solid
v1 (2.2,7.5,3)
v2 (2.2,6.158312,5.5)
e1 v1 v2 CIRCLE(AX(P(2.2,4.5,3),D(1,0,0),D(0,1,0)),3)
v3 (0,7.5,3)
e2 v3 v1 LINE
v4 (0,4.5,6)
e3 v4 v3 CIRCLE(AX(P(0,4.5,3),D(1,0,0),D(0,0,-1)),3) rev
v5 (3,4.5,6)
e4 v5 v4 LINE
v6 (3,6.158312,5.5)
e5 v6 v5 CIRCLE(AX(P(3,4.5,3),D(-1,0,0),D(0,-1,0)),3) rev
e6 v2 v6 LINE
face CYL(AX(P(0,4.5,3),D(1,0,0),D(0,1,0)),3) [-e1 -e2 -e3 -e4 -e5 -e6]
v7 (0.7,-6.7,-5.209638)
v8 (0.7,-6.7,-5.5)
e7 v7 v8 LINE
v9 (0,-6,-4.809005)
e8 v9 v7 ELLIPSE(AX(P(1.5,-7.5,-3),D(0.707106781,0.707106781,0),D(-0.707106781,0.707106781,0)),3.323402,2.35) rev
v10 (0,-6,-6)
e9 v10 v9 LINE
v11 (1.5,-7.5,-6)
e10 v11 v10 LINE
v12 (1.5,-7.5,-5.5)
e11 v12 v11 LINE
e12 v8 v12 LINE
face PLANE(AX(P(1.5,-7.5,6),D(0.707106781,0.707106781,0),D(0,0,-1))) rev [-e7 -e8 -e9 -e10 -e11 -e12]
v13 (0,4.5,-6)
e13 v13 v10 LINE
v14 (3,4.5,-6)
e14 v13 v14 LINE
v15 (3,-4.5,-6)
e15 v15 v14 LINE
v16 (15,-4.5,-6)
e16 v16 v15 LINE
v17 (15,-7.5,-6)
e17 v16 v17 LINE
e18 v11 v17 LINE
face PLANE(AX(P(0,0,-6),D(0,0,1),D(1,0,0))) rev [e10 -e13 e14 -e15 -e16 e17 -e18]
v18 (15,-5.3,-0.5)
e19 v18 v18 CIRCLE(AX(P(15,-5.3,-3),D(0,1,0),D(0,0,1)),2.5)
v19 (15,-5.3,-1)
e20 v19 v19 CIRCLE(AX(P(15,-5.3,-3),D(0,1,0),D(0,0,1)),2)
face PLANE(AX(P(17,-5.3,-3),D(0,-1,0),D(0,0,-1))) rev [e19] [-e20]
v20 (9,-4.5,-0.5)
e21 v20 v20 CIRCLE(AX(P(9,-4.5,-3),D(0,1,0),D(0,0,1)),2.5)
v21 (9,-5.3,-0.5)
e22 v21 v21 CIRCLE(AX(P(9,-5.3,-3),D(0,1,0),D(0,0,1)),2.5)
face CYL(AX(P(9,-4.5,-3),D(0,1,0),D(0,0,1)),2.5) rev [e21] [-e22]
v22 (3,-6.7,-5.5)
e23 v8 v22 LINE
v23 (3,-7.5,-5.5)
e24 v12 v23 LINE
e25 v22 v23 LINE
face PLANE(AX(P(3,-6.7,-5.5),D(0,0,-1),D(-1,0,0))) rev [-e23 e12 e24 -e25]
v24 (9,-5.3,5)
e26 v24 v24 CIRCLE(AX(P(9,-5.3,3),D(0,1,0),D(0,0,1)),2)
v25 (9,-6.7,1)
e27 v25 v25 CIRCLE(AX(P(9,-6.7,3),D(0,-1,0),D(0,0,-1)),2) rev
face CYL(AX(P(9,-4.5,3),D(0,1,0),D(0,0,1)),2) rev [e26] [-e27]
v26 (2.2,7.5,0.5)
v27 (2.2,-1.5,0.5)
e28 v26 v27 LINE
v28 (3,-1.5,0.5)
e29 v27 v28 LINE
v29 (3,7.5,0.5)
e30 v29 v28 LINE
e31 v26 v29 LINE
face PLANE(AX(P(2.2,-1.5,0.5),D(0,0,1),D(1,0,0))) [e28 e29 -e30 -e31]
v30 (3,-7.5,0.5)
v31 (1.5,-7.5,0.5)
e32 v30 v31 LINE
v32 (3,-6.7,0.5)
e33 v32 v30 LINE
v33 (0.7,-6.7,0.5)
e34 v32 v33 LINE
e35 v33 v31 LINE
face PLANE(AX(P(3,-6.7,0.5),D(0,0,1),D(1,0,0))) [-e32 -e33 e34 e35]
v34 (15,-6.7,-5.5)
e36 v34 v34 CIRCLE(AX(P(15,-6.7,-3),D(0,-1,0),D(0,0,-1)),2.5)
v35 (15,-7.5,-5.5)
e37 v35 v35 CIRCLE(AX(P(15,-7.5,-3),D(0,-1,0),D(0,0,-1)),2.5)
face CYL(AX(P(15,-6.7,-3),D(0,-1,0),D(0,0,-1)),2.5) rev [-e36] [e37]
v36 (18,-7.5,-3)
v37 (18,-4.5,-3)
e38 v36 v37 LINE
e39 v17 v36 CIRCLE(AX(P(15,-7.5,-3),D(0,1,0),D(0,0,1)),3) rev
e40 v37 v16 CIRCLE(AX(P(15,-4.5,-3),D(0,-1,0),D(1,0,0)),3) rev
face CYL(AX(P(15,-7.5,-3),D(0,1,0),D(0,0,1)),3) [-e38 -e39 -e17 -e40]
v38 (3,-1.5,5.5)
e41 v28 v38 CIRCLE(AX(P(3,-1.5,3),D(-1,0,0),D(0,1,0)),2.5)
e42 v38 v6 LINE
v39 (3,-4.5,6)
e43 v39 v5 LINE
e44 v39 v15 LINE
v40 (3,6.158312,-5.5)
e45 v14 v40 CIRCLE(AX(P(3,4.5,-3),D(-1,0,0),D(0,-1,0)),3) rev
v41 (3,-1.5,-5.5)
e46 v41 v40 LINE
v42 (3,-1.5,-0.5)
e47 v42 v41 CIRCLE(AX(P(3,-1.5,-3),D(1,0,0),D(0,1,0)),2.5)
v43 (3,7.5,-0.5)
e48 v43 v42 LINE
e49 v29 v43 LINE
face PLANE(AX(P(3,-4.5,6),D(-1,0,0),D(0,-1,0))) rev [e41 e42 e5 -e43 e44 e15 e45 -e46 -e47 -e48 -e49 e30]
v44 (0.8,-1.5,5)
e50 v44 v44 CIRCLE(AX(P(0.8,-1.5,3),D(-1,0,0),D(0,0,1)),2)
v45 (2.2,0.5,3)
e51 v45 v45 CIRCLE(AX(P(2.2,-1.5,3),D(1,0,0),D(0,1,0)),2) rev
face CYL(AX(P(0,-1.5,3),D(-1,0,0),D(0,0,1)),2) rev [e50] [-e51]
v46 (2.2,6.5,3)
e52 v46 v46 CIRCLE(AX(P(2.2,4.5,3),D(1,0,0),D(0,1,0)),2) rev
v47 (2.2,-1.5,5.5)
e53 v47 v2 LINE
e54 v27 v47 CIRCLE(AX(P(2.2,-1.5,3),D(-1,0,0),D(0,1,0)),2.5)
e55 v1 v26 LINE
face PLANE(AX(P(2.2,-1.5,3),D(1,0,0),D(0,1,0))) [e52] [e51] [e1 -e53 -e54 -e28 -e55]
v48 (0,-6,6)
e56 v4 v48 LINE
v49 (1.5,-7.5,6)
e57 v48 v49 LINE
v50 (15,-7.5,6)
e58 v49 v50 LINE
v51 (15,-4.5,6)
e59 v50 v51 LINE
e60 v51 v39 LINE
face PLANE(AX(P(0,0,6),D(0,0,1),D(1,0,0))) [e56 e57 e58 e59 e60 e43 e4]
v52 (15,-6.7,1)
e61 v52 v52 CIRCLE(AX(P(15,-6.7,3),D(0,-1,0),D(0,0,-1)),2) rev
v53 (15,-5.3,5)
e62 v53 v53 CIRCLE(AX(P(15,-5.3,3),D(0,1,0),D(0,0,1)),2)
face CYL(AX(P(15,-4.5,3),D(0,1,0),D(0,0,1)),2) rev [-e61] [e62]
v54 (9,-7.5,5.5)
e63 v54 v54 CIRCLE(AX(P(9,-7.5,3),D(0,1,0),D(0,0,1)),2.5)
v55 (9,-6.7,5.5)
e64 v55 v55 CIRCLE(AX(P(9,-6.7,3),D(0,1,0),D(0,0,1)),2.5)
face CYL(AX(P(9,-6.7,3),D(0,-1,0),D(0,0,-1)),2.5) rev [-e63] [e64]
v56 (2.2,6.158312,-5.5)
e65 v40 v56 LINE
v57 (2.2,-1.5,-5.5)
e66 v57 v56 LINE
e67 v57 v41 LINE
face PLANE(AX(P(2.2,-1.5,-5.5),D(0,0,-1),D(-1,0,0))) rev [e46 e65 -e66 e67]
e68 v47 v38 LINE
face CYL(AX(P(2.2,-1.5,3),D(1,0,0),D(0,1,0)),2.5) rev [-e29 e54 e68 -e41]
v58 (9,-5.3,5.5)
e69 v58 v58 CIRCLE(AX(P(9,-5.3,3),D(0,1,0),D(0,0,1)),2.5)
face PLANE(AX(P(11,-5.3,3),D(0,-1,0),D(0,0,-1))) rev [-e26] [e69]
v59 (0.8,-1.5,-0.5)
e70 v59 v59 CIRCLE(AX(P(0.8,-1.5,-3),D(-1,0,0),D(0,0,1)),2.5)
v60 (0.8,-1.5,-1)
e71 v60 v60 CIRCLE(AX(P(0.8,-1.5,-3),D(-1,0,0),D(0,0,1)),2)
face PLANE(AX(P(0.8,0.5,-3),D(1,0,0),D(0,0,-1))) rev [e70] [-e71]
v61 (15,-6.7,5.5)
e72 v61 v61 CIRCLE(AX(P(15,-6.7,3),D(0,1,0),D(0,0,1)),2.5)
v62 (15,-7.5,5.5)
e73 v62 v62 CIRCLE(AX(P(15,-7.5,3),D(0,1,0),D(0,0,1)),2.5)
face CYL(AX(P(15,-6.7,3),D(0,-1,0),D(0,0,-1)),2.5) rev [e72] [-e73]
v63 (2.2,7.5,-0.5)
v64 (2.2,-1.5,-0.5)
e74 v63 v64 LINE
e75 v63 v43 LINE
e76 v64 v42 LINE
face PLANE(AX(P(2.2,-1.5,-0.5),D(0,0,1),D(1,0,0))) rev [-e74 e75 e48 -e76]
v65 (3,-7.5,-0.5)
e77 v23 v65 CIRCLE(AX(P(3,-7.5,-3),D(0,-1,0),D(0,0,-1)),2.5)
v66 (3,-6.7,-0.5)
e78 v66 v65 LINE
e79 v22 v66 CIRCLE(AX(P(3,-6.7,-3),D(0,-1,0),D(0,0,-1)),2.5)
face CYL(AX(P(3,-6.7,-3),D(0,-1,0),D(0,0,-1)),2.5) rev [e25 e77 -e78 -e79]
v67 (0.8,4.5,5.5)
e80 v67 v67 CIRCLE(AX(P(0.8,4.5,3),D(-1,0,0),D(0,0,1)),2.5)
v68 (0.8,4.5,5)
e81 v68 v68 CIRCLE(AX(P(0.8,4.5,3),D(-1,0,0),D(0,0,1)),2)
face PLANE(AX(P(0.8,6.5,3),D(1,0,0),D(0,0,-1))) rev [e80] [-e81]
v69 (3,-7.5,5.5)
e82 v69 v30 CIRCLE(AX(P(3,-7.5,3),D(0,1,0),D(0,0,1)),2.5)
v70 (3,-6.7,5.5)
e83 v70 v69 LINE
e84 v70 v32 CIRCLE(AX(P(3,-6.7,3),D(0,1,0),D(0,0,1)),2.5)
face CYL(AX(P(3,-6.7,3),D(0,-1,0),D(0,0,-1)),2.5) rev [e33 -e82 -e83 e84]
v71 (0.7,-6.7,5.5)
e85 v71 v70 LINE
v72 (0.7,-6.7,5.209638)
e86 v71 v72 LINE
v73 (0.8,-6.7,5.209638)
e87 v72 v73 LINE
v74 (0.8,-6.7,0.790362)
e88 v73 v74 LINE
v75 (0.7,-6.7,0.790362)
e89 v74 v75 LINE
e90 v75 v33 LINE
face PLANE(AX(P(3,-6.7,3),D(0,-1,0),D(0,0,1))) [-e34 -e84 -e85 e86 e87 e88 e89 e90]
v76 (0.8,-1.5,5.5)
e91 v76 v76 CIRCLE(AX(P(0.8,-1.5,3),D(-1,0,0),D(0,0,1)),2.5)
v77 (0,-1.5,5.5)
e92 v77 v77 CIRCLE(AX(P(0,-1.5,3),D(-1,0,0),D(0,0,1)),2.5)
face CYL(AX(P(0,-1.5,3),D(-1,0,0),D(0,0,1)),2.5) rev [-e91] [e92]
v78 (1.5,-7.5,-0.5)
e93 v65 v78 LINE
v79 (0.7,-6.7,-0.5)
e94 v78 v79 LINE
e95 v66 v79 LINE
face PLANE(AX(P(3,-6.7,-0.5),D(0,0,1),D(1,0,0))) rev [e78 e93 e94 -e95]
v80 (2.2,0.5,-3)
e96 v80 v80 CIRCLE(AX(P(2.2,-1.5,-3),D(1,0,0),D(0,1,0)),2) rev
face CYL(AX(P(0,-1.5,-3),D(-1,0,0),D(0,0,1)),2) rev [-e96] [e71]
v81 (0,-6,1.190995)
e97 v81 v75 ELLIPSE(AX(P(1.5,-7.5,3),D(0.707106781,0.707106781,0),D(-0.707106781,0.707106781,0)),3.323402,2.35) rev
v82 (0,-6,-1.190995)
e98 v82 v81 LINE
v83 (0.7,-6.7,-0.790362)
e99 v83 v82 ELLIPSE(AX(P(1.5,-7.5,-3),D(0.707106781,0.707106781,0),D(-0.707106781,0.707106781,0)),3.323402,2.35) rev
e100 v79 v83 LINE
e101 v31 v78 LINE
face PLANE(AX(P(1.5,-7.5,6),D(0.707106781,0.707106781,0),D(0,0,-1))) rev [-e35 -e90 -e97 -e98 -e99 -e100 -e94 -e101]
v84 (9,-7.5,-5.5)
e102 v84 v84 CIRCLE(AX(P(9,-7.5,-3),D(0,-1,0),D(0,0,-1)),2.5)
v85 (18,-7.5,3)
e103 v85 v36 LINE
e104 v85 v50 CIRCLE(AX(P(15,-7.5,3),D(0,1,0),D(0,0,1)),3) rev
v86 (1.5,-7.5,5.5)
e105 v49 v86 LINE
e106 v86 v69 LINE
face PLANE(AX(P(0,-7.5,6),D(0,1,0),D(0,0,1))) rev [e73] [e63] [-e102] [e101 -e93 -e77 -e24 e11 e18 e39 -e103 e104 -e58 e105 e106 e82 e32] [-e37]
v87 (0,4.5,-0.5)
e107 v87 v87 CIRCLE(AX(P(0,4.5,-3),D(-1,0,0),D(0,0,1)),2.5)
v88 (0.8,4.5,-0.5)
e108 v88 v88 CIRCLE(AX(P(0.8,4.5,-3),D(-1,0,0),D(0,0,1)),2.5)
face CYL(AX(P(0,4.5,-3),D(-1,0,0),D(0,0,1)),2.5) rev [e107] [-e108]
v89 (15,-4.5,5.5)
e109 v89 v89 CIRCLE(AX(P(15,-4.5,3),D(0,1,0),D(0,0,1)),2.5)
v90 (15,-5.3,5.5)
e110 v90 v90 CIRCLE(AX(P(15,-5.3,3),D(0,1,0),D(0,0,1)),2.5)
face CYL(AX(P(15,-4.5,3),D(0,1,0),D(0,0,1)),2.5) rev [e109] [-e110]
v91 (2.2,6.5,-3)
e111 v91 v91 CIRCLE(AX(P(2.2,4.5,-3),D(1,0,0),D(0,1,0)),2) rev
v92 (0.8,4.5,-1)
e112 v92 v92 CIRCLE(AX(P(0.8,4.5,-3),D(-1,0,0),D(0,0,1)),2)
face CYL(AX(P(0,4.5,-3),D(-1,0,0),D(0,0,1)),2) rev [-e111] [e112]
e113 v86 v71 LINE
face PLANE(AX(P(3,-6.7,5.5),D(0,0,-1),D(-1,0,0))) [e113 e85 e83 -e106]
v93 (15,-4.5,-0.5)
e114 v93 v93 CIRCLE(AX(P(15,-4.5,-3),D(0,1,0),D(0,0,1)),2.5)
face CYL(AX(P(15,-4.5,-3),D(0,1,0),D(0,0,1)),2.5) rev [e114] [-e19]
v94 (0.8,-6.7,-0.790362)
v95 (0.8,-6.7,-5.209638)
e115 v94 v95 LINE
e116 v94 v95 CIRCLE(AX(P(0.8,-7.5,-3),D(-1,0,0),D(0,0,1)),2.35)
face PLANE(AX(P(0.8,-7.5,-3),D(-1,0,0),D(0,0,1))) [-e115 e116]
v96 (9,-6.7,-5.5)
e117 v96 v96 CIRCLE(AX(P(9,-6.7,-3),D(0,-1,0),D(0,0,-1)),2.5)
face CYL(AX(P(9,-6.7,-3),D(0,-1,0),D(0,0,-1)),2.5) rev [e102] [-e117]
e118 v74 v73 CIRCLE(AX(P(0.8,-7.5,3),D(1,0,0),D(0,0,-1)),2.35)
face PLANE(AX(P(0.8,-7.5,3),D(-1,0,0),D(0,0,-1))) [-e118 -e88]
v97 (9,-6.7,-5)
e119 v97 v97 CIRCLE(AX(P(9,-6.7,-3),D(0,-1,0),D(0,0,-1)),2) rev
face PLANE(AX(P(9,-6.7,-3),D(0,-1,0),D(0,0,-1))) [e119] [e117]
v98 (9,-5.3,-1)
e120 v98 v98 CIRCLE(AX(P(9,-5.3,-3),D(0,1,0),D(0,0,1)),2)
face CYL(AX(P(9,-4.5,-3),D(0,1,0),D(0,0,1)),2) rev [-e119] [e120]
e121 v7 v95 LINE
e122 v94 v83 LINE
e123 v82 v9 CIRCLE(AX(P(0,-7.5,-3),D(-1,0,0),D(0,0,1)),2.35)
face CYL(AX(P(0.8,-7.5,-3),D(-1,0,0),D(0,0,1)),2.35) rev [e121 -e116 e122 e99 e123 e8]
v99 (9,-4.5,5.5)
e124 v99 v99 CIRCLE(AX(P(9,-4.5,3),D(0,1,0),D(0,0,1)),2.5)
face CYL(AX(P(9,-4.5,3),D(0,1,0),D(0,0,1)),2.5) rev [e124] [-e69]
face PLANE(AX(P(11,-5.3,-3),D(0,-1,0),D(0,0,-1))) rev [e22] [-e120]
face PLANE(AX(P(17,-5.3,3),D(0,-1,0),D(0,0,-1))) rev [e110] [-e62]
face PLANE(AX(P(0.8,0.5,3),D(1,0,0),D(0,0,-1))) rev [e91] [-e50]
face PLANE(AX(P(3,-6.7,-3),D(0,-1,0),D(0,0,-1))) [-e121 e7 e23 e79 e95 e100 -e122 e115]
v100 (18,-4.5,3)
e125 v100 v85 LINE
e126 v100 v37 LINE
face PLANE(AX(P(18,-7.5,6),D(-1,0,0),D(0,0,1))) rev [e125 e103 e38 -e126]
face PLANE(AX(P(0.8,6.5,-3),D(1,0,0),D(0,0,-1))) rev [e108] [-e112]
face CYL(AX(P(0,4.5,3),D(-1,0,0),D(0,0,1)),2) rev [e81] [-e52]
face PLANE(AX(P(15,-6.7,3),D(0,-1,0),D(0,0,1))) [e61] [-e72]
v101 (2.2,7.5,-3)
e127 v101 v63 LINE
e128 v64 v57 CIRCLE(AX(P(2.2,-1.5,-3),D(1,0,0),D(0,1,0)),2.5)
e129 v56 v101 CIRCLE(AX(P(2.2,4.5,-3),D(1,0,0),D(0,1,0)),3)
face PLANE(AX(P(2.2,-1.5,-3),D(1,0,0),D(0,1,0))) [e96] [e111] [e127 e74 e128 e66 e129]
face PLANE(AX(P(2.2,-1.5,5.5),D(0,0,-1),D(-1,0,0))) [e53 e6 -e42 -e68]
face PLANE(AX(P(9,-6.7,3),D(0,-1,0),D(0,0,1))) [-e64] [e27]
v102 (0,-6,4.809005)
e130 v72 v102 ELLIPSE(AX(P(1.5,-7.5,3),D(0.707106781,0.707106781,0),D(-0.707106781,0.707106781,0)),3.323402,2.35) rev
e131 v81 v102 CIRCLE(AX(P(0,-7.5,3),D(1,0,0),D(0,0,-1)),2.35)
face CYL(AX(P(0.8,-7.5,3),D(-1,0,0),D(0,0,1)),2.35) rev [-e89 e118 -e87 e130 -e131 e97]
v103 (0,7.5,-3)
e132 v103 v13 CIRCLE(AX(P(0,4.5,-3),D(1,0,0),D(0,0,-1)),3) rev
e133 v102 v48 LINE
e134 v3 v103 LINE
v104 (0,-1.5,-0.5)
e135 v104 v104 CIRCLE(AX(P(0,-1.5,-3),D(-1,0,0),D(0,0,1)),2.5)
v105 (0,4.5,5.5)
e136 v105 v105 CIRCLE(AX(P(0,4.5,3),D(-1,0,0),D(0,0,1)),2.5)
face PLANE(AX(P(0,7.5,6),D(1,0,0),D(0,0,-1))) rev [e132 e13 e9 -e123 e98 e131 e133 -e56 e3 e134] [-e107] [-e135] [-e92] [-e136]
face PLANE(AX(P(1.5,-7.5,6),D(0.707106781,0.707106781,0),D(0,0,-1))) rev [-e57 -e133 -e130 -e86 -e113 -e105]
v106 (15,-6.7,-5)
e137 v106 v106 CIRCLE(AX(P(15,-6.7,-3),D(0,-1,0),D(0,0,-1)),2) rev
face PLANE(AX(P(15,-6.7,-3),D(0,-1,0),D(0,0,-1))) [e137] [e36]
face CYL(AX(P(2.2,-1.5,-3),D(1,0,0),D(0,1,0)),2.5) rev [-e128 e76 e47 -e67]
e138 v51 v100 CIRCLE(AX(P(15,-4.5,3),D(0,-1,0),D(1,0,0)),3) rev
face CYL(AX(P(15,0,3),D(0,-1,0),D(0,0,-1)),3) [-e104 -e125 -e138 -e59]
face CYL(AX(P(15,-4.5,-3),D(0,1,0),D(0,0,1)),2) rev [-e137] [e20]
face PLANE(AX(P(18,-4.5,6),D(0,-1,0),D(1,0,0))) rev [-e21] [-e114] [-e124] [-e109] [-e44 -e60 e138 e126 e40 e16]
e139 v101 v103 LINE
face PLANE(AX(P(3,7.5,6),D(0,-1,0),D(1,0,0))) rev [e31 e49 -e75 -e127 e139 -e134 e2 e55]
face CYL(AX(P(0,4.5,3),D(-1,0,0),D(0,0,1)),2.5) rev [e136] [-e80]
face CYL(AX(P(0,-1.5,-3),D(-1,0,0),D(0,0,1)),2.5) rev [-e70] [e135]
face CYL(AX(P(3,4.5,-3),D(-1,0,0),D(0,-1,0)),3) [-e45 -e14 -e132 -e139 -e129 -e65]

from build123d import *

# Parameters (mm, degrees)
BOSS_EXTRUDE1_DEPTH = 6
HOLE2_D             = 4
HOLE2_DEPTH         = 3
HOLE2_CBORE_D       = 5
HOLE2_CBORE_DEPTH   = 0.8
HOLE2_TIP           = 1.201721238
HOLE3_D             = 4
HOLE3_DEPTH         = 18
HOLE3_CBORE_D       = 5
HOLE3_CBORE_DEPTH   = 0.8
HOLE3_TIP           = 1.201721238
CUT_EXTRUDE1_START  = -0.8
CUT_EXTRUDE1_DEPTH  = 0.8
CUT_EXTRUDE2_START  = -0.8
SKETCH12_R          = 2.5
CUT_EXTRUDE2_DEPTH  = 0.8
SKETCH14_R          = 2.35
CUT_EXTRUDE3_DEPTH  = 0.8
CHAMFER1_SIZE       = 1.5
FILLET1_R           = 3


with BuildPart() as part:
    # Sketch1 → Boss-Extrude1 (new, symmetric)
    with BuildSketch(Plane.XY):
        Polygon((0, 7.5), (0, -7.5), (18, -7.5), (18, -4.5), (3, -4.5), (3, 7.5), align=None)
    extrude(amount=BOSS_EXTRUDE1_DEPTH, both=True)

    # Hole2
    with Locations(Plane(origin=(0, -4.5, 0), x_dir=(1, 0, 0), z_dir=(0, 1, 0))):
        with Locations((15, 3), (9, 3), (9, -3), (15, -3)):
            CounterBoreHole(HOLE2_D / 2, HOLE2_CBORE_D / 2, HOLE2_CBORE_DEPTH, depth=HOLE2_DEPTH)
            with Locations((0, 0, -(HOLE2_DEPTH + HOLE2_TIP / 2))):  # 118° drill point
                Cone(0, HOLE2_D / 2, HOLE2_TIP, mode=Mode.SUBTRACT)

    # Hole3
    with Locations(Plane.ZY):
        with Locations((3, -1.5), (-3, -1.5), (3, 4.5), (-3, 4.5)):
            CounterBoreHole(HOLE3_D / 2, HOLE3_CBORE_D / 2, HOLE3_CBORE_DEPTH, depth=HOLE3_DEPTH)
            with Locations((0, 0, -(HOLE3_DEPTH + HOLE3_TIP / 2))):  # 118° drill point
                Cone(0, HOLE3_D / 2, HOLE3_TIP, mode=Mode.SUBTRACT)

    # Sketch11 → Cut-Extrude1 (cut)
    with BuildSketch(Plane(origin=(3, 0, 0), x_dir=(0, 0, -1), z_dir=(1, 0, 0)).offset(CUT_EXTRUDE1_START)):
        with BuildLine():
            Line((5.5, -1.5), (5.5, 7.5))
            Line((5.5, 7.5), (0.5, 7.5))
            Line((0.5, 7.5), (0.5, -1.5))
            ThreePointArc((0.5, -1.5), (3, -4), (5.5, -1.5))
        make_face()
    cut_extrude1 = extrude(amount=CUT_EXTRUDE1_DEPTH, mode=Mode.SUBTRACT)

    # Sketch12 → Cut-Extrude2 (cut)
    with BuildSketch(Plane(origin=(0, -7.5, 0), x_dir=(-1, 0, 0), z_dir=(0, -1, 0)).offset(CUT_EXTRUDE2_START)):
        with Locations(Location((-9, 3, 0), (0, 0, 270))):
            Circle(SKETCH12_R)
        with Locations(Location((-15, 3, 0), (0, 0, 270))):
            Circle(SKETCH12_R)
        with BuildLine():
            Line((-3, 0.5), (0, 0.5))
            Line((0, 0.5), (0, 5.5))
            Line((0, 5.5), (-3, 5.5))
            ThreePointArc((-3, 5.5), (-5.5, 3), (-3, 0.5))
        make_face()
    cut_extrude2 = extrude(amount=CUT_EXTRUDE2_DEPTH, mode=Mode.SUBTRACT)

    # Sketch14 → Cut-Extrude3 (cut)
    with BuildSketch(Plane.ZY):
        with Locations((-3, -7.5)):
            Circle(SKETCH14_R)
    cut_extrude3 = extrude(amount=-CUT_EXTRUDE3_DEPTH, mode=Mode.SUBTRACT)

    # Mirror1: Cut-Extrude1, Cut-Extrude2, Cut-Extrude3 across plane
    add(cut_extrude1.mirror(Plane.XY), mode=Mode.SUBTRACT)
    add(cut_extrude2.mirror(Plane.XY), mode=Mode.SUBTRACT)
    add(cut_extrude3.mirror(Plane.XY), mode=Mode.SUBTRACT)

    # Chamfer1
    # the kernel refuses this chamfer: 1.5 mm, written as the material it takes off along each edge
    with BuildSketch(Plane(origin=(0, -7.5, 1.642475518), x_dir=(-0.027495876610586376, 0.9996219169112968, 0), z_dir=(0, 0, 1)), Plane(origin=(0, -7.5, -9.857524482), x_dir=(-0.027495876610586376, 0.9996219169112968, 0), z_dir=(0, 0, 1))) as chamfer1_piece_1:
        Polygon((CHAMFER1_SIZE * 0.999621916911, -CHAMFER1_SIZE * 0.0274958766106), (-CHAMFER1_SIZE * 0.0274958766106, -CHAMFER1_SIZE * 0.999621916911), (0, 0), align=None)
    extrude(amount=8.215048964, mode=Mode.SUBTRACT)
    with BuildSketch(Plane(origin=(0, -7.5, -4.357524482), x_dir=(-0.027495876610586376, 0.9996219169112968, 0), z_dir=(0, 0, 1))) as chamfer1_piece_2:
        Polygon((CHAMFER1_SIZE * 0.999621916911, -CHAMFER1_SIZE * 0.0274958766106), (-CHAMFER1_SIZE * 0.0274958766106, -CHAMFER1_SIZE * 0.999621916911), (0, 0), align=None)
    extrude(amount=8.715048964, mode=Mode.SUBTRACT)

    # Fillet1
    fillet1_edges = [part.edges().sort_by_distance(p)[0] for p in [
        (18, -6, 6),
        (18, -6, -6),
        (1.5, 7.5, 6),
        (1.5, 7.5, -6),
    ]]
    fillet(fillet1_edges, radius=FILLET1_R)


solid = part.part
